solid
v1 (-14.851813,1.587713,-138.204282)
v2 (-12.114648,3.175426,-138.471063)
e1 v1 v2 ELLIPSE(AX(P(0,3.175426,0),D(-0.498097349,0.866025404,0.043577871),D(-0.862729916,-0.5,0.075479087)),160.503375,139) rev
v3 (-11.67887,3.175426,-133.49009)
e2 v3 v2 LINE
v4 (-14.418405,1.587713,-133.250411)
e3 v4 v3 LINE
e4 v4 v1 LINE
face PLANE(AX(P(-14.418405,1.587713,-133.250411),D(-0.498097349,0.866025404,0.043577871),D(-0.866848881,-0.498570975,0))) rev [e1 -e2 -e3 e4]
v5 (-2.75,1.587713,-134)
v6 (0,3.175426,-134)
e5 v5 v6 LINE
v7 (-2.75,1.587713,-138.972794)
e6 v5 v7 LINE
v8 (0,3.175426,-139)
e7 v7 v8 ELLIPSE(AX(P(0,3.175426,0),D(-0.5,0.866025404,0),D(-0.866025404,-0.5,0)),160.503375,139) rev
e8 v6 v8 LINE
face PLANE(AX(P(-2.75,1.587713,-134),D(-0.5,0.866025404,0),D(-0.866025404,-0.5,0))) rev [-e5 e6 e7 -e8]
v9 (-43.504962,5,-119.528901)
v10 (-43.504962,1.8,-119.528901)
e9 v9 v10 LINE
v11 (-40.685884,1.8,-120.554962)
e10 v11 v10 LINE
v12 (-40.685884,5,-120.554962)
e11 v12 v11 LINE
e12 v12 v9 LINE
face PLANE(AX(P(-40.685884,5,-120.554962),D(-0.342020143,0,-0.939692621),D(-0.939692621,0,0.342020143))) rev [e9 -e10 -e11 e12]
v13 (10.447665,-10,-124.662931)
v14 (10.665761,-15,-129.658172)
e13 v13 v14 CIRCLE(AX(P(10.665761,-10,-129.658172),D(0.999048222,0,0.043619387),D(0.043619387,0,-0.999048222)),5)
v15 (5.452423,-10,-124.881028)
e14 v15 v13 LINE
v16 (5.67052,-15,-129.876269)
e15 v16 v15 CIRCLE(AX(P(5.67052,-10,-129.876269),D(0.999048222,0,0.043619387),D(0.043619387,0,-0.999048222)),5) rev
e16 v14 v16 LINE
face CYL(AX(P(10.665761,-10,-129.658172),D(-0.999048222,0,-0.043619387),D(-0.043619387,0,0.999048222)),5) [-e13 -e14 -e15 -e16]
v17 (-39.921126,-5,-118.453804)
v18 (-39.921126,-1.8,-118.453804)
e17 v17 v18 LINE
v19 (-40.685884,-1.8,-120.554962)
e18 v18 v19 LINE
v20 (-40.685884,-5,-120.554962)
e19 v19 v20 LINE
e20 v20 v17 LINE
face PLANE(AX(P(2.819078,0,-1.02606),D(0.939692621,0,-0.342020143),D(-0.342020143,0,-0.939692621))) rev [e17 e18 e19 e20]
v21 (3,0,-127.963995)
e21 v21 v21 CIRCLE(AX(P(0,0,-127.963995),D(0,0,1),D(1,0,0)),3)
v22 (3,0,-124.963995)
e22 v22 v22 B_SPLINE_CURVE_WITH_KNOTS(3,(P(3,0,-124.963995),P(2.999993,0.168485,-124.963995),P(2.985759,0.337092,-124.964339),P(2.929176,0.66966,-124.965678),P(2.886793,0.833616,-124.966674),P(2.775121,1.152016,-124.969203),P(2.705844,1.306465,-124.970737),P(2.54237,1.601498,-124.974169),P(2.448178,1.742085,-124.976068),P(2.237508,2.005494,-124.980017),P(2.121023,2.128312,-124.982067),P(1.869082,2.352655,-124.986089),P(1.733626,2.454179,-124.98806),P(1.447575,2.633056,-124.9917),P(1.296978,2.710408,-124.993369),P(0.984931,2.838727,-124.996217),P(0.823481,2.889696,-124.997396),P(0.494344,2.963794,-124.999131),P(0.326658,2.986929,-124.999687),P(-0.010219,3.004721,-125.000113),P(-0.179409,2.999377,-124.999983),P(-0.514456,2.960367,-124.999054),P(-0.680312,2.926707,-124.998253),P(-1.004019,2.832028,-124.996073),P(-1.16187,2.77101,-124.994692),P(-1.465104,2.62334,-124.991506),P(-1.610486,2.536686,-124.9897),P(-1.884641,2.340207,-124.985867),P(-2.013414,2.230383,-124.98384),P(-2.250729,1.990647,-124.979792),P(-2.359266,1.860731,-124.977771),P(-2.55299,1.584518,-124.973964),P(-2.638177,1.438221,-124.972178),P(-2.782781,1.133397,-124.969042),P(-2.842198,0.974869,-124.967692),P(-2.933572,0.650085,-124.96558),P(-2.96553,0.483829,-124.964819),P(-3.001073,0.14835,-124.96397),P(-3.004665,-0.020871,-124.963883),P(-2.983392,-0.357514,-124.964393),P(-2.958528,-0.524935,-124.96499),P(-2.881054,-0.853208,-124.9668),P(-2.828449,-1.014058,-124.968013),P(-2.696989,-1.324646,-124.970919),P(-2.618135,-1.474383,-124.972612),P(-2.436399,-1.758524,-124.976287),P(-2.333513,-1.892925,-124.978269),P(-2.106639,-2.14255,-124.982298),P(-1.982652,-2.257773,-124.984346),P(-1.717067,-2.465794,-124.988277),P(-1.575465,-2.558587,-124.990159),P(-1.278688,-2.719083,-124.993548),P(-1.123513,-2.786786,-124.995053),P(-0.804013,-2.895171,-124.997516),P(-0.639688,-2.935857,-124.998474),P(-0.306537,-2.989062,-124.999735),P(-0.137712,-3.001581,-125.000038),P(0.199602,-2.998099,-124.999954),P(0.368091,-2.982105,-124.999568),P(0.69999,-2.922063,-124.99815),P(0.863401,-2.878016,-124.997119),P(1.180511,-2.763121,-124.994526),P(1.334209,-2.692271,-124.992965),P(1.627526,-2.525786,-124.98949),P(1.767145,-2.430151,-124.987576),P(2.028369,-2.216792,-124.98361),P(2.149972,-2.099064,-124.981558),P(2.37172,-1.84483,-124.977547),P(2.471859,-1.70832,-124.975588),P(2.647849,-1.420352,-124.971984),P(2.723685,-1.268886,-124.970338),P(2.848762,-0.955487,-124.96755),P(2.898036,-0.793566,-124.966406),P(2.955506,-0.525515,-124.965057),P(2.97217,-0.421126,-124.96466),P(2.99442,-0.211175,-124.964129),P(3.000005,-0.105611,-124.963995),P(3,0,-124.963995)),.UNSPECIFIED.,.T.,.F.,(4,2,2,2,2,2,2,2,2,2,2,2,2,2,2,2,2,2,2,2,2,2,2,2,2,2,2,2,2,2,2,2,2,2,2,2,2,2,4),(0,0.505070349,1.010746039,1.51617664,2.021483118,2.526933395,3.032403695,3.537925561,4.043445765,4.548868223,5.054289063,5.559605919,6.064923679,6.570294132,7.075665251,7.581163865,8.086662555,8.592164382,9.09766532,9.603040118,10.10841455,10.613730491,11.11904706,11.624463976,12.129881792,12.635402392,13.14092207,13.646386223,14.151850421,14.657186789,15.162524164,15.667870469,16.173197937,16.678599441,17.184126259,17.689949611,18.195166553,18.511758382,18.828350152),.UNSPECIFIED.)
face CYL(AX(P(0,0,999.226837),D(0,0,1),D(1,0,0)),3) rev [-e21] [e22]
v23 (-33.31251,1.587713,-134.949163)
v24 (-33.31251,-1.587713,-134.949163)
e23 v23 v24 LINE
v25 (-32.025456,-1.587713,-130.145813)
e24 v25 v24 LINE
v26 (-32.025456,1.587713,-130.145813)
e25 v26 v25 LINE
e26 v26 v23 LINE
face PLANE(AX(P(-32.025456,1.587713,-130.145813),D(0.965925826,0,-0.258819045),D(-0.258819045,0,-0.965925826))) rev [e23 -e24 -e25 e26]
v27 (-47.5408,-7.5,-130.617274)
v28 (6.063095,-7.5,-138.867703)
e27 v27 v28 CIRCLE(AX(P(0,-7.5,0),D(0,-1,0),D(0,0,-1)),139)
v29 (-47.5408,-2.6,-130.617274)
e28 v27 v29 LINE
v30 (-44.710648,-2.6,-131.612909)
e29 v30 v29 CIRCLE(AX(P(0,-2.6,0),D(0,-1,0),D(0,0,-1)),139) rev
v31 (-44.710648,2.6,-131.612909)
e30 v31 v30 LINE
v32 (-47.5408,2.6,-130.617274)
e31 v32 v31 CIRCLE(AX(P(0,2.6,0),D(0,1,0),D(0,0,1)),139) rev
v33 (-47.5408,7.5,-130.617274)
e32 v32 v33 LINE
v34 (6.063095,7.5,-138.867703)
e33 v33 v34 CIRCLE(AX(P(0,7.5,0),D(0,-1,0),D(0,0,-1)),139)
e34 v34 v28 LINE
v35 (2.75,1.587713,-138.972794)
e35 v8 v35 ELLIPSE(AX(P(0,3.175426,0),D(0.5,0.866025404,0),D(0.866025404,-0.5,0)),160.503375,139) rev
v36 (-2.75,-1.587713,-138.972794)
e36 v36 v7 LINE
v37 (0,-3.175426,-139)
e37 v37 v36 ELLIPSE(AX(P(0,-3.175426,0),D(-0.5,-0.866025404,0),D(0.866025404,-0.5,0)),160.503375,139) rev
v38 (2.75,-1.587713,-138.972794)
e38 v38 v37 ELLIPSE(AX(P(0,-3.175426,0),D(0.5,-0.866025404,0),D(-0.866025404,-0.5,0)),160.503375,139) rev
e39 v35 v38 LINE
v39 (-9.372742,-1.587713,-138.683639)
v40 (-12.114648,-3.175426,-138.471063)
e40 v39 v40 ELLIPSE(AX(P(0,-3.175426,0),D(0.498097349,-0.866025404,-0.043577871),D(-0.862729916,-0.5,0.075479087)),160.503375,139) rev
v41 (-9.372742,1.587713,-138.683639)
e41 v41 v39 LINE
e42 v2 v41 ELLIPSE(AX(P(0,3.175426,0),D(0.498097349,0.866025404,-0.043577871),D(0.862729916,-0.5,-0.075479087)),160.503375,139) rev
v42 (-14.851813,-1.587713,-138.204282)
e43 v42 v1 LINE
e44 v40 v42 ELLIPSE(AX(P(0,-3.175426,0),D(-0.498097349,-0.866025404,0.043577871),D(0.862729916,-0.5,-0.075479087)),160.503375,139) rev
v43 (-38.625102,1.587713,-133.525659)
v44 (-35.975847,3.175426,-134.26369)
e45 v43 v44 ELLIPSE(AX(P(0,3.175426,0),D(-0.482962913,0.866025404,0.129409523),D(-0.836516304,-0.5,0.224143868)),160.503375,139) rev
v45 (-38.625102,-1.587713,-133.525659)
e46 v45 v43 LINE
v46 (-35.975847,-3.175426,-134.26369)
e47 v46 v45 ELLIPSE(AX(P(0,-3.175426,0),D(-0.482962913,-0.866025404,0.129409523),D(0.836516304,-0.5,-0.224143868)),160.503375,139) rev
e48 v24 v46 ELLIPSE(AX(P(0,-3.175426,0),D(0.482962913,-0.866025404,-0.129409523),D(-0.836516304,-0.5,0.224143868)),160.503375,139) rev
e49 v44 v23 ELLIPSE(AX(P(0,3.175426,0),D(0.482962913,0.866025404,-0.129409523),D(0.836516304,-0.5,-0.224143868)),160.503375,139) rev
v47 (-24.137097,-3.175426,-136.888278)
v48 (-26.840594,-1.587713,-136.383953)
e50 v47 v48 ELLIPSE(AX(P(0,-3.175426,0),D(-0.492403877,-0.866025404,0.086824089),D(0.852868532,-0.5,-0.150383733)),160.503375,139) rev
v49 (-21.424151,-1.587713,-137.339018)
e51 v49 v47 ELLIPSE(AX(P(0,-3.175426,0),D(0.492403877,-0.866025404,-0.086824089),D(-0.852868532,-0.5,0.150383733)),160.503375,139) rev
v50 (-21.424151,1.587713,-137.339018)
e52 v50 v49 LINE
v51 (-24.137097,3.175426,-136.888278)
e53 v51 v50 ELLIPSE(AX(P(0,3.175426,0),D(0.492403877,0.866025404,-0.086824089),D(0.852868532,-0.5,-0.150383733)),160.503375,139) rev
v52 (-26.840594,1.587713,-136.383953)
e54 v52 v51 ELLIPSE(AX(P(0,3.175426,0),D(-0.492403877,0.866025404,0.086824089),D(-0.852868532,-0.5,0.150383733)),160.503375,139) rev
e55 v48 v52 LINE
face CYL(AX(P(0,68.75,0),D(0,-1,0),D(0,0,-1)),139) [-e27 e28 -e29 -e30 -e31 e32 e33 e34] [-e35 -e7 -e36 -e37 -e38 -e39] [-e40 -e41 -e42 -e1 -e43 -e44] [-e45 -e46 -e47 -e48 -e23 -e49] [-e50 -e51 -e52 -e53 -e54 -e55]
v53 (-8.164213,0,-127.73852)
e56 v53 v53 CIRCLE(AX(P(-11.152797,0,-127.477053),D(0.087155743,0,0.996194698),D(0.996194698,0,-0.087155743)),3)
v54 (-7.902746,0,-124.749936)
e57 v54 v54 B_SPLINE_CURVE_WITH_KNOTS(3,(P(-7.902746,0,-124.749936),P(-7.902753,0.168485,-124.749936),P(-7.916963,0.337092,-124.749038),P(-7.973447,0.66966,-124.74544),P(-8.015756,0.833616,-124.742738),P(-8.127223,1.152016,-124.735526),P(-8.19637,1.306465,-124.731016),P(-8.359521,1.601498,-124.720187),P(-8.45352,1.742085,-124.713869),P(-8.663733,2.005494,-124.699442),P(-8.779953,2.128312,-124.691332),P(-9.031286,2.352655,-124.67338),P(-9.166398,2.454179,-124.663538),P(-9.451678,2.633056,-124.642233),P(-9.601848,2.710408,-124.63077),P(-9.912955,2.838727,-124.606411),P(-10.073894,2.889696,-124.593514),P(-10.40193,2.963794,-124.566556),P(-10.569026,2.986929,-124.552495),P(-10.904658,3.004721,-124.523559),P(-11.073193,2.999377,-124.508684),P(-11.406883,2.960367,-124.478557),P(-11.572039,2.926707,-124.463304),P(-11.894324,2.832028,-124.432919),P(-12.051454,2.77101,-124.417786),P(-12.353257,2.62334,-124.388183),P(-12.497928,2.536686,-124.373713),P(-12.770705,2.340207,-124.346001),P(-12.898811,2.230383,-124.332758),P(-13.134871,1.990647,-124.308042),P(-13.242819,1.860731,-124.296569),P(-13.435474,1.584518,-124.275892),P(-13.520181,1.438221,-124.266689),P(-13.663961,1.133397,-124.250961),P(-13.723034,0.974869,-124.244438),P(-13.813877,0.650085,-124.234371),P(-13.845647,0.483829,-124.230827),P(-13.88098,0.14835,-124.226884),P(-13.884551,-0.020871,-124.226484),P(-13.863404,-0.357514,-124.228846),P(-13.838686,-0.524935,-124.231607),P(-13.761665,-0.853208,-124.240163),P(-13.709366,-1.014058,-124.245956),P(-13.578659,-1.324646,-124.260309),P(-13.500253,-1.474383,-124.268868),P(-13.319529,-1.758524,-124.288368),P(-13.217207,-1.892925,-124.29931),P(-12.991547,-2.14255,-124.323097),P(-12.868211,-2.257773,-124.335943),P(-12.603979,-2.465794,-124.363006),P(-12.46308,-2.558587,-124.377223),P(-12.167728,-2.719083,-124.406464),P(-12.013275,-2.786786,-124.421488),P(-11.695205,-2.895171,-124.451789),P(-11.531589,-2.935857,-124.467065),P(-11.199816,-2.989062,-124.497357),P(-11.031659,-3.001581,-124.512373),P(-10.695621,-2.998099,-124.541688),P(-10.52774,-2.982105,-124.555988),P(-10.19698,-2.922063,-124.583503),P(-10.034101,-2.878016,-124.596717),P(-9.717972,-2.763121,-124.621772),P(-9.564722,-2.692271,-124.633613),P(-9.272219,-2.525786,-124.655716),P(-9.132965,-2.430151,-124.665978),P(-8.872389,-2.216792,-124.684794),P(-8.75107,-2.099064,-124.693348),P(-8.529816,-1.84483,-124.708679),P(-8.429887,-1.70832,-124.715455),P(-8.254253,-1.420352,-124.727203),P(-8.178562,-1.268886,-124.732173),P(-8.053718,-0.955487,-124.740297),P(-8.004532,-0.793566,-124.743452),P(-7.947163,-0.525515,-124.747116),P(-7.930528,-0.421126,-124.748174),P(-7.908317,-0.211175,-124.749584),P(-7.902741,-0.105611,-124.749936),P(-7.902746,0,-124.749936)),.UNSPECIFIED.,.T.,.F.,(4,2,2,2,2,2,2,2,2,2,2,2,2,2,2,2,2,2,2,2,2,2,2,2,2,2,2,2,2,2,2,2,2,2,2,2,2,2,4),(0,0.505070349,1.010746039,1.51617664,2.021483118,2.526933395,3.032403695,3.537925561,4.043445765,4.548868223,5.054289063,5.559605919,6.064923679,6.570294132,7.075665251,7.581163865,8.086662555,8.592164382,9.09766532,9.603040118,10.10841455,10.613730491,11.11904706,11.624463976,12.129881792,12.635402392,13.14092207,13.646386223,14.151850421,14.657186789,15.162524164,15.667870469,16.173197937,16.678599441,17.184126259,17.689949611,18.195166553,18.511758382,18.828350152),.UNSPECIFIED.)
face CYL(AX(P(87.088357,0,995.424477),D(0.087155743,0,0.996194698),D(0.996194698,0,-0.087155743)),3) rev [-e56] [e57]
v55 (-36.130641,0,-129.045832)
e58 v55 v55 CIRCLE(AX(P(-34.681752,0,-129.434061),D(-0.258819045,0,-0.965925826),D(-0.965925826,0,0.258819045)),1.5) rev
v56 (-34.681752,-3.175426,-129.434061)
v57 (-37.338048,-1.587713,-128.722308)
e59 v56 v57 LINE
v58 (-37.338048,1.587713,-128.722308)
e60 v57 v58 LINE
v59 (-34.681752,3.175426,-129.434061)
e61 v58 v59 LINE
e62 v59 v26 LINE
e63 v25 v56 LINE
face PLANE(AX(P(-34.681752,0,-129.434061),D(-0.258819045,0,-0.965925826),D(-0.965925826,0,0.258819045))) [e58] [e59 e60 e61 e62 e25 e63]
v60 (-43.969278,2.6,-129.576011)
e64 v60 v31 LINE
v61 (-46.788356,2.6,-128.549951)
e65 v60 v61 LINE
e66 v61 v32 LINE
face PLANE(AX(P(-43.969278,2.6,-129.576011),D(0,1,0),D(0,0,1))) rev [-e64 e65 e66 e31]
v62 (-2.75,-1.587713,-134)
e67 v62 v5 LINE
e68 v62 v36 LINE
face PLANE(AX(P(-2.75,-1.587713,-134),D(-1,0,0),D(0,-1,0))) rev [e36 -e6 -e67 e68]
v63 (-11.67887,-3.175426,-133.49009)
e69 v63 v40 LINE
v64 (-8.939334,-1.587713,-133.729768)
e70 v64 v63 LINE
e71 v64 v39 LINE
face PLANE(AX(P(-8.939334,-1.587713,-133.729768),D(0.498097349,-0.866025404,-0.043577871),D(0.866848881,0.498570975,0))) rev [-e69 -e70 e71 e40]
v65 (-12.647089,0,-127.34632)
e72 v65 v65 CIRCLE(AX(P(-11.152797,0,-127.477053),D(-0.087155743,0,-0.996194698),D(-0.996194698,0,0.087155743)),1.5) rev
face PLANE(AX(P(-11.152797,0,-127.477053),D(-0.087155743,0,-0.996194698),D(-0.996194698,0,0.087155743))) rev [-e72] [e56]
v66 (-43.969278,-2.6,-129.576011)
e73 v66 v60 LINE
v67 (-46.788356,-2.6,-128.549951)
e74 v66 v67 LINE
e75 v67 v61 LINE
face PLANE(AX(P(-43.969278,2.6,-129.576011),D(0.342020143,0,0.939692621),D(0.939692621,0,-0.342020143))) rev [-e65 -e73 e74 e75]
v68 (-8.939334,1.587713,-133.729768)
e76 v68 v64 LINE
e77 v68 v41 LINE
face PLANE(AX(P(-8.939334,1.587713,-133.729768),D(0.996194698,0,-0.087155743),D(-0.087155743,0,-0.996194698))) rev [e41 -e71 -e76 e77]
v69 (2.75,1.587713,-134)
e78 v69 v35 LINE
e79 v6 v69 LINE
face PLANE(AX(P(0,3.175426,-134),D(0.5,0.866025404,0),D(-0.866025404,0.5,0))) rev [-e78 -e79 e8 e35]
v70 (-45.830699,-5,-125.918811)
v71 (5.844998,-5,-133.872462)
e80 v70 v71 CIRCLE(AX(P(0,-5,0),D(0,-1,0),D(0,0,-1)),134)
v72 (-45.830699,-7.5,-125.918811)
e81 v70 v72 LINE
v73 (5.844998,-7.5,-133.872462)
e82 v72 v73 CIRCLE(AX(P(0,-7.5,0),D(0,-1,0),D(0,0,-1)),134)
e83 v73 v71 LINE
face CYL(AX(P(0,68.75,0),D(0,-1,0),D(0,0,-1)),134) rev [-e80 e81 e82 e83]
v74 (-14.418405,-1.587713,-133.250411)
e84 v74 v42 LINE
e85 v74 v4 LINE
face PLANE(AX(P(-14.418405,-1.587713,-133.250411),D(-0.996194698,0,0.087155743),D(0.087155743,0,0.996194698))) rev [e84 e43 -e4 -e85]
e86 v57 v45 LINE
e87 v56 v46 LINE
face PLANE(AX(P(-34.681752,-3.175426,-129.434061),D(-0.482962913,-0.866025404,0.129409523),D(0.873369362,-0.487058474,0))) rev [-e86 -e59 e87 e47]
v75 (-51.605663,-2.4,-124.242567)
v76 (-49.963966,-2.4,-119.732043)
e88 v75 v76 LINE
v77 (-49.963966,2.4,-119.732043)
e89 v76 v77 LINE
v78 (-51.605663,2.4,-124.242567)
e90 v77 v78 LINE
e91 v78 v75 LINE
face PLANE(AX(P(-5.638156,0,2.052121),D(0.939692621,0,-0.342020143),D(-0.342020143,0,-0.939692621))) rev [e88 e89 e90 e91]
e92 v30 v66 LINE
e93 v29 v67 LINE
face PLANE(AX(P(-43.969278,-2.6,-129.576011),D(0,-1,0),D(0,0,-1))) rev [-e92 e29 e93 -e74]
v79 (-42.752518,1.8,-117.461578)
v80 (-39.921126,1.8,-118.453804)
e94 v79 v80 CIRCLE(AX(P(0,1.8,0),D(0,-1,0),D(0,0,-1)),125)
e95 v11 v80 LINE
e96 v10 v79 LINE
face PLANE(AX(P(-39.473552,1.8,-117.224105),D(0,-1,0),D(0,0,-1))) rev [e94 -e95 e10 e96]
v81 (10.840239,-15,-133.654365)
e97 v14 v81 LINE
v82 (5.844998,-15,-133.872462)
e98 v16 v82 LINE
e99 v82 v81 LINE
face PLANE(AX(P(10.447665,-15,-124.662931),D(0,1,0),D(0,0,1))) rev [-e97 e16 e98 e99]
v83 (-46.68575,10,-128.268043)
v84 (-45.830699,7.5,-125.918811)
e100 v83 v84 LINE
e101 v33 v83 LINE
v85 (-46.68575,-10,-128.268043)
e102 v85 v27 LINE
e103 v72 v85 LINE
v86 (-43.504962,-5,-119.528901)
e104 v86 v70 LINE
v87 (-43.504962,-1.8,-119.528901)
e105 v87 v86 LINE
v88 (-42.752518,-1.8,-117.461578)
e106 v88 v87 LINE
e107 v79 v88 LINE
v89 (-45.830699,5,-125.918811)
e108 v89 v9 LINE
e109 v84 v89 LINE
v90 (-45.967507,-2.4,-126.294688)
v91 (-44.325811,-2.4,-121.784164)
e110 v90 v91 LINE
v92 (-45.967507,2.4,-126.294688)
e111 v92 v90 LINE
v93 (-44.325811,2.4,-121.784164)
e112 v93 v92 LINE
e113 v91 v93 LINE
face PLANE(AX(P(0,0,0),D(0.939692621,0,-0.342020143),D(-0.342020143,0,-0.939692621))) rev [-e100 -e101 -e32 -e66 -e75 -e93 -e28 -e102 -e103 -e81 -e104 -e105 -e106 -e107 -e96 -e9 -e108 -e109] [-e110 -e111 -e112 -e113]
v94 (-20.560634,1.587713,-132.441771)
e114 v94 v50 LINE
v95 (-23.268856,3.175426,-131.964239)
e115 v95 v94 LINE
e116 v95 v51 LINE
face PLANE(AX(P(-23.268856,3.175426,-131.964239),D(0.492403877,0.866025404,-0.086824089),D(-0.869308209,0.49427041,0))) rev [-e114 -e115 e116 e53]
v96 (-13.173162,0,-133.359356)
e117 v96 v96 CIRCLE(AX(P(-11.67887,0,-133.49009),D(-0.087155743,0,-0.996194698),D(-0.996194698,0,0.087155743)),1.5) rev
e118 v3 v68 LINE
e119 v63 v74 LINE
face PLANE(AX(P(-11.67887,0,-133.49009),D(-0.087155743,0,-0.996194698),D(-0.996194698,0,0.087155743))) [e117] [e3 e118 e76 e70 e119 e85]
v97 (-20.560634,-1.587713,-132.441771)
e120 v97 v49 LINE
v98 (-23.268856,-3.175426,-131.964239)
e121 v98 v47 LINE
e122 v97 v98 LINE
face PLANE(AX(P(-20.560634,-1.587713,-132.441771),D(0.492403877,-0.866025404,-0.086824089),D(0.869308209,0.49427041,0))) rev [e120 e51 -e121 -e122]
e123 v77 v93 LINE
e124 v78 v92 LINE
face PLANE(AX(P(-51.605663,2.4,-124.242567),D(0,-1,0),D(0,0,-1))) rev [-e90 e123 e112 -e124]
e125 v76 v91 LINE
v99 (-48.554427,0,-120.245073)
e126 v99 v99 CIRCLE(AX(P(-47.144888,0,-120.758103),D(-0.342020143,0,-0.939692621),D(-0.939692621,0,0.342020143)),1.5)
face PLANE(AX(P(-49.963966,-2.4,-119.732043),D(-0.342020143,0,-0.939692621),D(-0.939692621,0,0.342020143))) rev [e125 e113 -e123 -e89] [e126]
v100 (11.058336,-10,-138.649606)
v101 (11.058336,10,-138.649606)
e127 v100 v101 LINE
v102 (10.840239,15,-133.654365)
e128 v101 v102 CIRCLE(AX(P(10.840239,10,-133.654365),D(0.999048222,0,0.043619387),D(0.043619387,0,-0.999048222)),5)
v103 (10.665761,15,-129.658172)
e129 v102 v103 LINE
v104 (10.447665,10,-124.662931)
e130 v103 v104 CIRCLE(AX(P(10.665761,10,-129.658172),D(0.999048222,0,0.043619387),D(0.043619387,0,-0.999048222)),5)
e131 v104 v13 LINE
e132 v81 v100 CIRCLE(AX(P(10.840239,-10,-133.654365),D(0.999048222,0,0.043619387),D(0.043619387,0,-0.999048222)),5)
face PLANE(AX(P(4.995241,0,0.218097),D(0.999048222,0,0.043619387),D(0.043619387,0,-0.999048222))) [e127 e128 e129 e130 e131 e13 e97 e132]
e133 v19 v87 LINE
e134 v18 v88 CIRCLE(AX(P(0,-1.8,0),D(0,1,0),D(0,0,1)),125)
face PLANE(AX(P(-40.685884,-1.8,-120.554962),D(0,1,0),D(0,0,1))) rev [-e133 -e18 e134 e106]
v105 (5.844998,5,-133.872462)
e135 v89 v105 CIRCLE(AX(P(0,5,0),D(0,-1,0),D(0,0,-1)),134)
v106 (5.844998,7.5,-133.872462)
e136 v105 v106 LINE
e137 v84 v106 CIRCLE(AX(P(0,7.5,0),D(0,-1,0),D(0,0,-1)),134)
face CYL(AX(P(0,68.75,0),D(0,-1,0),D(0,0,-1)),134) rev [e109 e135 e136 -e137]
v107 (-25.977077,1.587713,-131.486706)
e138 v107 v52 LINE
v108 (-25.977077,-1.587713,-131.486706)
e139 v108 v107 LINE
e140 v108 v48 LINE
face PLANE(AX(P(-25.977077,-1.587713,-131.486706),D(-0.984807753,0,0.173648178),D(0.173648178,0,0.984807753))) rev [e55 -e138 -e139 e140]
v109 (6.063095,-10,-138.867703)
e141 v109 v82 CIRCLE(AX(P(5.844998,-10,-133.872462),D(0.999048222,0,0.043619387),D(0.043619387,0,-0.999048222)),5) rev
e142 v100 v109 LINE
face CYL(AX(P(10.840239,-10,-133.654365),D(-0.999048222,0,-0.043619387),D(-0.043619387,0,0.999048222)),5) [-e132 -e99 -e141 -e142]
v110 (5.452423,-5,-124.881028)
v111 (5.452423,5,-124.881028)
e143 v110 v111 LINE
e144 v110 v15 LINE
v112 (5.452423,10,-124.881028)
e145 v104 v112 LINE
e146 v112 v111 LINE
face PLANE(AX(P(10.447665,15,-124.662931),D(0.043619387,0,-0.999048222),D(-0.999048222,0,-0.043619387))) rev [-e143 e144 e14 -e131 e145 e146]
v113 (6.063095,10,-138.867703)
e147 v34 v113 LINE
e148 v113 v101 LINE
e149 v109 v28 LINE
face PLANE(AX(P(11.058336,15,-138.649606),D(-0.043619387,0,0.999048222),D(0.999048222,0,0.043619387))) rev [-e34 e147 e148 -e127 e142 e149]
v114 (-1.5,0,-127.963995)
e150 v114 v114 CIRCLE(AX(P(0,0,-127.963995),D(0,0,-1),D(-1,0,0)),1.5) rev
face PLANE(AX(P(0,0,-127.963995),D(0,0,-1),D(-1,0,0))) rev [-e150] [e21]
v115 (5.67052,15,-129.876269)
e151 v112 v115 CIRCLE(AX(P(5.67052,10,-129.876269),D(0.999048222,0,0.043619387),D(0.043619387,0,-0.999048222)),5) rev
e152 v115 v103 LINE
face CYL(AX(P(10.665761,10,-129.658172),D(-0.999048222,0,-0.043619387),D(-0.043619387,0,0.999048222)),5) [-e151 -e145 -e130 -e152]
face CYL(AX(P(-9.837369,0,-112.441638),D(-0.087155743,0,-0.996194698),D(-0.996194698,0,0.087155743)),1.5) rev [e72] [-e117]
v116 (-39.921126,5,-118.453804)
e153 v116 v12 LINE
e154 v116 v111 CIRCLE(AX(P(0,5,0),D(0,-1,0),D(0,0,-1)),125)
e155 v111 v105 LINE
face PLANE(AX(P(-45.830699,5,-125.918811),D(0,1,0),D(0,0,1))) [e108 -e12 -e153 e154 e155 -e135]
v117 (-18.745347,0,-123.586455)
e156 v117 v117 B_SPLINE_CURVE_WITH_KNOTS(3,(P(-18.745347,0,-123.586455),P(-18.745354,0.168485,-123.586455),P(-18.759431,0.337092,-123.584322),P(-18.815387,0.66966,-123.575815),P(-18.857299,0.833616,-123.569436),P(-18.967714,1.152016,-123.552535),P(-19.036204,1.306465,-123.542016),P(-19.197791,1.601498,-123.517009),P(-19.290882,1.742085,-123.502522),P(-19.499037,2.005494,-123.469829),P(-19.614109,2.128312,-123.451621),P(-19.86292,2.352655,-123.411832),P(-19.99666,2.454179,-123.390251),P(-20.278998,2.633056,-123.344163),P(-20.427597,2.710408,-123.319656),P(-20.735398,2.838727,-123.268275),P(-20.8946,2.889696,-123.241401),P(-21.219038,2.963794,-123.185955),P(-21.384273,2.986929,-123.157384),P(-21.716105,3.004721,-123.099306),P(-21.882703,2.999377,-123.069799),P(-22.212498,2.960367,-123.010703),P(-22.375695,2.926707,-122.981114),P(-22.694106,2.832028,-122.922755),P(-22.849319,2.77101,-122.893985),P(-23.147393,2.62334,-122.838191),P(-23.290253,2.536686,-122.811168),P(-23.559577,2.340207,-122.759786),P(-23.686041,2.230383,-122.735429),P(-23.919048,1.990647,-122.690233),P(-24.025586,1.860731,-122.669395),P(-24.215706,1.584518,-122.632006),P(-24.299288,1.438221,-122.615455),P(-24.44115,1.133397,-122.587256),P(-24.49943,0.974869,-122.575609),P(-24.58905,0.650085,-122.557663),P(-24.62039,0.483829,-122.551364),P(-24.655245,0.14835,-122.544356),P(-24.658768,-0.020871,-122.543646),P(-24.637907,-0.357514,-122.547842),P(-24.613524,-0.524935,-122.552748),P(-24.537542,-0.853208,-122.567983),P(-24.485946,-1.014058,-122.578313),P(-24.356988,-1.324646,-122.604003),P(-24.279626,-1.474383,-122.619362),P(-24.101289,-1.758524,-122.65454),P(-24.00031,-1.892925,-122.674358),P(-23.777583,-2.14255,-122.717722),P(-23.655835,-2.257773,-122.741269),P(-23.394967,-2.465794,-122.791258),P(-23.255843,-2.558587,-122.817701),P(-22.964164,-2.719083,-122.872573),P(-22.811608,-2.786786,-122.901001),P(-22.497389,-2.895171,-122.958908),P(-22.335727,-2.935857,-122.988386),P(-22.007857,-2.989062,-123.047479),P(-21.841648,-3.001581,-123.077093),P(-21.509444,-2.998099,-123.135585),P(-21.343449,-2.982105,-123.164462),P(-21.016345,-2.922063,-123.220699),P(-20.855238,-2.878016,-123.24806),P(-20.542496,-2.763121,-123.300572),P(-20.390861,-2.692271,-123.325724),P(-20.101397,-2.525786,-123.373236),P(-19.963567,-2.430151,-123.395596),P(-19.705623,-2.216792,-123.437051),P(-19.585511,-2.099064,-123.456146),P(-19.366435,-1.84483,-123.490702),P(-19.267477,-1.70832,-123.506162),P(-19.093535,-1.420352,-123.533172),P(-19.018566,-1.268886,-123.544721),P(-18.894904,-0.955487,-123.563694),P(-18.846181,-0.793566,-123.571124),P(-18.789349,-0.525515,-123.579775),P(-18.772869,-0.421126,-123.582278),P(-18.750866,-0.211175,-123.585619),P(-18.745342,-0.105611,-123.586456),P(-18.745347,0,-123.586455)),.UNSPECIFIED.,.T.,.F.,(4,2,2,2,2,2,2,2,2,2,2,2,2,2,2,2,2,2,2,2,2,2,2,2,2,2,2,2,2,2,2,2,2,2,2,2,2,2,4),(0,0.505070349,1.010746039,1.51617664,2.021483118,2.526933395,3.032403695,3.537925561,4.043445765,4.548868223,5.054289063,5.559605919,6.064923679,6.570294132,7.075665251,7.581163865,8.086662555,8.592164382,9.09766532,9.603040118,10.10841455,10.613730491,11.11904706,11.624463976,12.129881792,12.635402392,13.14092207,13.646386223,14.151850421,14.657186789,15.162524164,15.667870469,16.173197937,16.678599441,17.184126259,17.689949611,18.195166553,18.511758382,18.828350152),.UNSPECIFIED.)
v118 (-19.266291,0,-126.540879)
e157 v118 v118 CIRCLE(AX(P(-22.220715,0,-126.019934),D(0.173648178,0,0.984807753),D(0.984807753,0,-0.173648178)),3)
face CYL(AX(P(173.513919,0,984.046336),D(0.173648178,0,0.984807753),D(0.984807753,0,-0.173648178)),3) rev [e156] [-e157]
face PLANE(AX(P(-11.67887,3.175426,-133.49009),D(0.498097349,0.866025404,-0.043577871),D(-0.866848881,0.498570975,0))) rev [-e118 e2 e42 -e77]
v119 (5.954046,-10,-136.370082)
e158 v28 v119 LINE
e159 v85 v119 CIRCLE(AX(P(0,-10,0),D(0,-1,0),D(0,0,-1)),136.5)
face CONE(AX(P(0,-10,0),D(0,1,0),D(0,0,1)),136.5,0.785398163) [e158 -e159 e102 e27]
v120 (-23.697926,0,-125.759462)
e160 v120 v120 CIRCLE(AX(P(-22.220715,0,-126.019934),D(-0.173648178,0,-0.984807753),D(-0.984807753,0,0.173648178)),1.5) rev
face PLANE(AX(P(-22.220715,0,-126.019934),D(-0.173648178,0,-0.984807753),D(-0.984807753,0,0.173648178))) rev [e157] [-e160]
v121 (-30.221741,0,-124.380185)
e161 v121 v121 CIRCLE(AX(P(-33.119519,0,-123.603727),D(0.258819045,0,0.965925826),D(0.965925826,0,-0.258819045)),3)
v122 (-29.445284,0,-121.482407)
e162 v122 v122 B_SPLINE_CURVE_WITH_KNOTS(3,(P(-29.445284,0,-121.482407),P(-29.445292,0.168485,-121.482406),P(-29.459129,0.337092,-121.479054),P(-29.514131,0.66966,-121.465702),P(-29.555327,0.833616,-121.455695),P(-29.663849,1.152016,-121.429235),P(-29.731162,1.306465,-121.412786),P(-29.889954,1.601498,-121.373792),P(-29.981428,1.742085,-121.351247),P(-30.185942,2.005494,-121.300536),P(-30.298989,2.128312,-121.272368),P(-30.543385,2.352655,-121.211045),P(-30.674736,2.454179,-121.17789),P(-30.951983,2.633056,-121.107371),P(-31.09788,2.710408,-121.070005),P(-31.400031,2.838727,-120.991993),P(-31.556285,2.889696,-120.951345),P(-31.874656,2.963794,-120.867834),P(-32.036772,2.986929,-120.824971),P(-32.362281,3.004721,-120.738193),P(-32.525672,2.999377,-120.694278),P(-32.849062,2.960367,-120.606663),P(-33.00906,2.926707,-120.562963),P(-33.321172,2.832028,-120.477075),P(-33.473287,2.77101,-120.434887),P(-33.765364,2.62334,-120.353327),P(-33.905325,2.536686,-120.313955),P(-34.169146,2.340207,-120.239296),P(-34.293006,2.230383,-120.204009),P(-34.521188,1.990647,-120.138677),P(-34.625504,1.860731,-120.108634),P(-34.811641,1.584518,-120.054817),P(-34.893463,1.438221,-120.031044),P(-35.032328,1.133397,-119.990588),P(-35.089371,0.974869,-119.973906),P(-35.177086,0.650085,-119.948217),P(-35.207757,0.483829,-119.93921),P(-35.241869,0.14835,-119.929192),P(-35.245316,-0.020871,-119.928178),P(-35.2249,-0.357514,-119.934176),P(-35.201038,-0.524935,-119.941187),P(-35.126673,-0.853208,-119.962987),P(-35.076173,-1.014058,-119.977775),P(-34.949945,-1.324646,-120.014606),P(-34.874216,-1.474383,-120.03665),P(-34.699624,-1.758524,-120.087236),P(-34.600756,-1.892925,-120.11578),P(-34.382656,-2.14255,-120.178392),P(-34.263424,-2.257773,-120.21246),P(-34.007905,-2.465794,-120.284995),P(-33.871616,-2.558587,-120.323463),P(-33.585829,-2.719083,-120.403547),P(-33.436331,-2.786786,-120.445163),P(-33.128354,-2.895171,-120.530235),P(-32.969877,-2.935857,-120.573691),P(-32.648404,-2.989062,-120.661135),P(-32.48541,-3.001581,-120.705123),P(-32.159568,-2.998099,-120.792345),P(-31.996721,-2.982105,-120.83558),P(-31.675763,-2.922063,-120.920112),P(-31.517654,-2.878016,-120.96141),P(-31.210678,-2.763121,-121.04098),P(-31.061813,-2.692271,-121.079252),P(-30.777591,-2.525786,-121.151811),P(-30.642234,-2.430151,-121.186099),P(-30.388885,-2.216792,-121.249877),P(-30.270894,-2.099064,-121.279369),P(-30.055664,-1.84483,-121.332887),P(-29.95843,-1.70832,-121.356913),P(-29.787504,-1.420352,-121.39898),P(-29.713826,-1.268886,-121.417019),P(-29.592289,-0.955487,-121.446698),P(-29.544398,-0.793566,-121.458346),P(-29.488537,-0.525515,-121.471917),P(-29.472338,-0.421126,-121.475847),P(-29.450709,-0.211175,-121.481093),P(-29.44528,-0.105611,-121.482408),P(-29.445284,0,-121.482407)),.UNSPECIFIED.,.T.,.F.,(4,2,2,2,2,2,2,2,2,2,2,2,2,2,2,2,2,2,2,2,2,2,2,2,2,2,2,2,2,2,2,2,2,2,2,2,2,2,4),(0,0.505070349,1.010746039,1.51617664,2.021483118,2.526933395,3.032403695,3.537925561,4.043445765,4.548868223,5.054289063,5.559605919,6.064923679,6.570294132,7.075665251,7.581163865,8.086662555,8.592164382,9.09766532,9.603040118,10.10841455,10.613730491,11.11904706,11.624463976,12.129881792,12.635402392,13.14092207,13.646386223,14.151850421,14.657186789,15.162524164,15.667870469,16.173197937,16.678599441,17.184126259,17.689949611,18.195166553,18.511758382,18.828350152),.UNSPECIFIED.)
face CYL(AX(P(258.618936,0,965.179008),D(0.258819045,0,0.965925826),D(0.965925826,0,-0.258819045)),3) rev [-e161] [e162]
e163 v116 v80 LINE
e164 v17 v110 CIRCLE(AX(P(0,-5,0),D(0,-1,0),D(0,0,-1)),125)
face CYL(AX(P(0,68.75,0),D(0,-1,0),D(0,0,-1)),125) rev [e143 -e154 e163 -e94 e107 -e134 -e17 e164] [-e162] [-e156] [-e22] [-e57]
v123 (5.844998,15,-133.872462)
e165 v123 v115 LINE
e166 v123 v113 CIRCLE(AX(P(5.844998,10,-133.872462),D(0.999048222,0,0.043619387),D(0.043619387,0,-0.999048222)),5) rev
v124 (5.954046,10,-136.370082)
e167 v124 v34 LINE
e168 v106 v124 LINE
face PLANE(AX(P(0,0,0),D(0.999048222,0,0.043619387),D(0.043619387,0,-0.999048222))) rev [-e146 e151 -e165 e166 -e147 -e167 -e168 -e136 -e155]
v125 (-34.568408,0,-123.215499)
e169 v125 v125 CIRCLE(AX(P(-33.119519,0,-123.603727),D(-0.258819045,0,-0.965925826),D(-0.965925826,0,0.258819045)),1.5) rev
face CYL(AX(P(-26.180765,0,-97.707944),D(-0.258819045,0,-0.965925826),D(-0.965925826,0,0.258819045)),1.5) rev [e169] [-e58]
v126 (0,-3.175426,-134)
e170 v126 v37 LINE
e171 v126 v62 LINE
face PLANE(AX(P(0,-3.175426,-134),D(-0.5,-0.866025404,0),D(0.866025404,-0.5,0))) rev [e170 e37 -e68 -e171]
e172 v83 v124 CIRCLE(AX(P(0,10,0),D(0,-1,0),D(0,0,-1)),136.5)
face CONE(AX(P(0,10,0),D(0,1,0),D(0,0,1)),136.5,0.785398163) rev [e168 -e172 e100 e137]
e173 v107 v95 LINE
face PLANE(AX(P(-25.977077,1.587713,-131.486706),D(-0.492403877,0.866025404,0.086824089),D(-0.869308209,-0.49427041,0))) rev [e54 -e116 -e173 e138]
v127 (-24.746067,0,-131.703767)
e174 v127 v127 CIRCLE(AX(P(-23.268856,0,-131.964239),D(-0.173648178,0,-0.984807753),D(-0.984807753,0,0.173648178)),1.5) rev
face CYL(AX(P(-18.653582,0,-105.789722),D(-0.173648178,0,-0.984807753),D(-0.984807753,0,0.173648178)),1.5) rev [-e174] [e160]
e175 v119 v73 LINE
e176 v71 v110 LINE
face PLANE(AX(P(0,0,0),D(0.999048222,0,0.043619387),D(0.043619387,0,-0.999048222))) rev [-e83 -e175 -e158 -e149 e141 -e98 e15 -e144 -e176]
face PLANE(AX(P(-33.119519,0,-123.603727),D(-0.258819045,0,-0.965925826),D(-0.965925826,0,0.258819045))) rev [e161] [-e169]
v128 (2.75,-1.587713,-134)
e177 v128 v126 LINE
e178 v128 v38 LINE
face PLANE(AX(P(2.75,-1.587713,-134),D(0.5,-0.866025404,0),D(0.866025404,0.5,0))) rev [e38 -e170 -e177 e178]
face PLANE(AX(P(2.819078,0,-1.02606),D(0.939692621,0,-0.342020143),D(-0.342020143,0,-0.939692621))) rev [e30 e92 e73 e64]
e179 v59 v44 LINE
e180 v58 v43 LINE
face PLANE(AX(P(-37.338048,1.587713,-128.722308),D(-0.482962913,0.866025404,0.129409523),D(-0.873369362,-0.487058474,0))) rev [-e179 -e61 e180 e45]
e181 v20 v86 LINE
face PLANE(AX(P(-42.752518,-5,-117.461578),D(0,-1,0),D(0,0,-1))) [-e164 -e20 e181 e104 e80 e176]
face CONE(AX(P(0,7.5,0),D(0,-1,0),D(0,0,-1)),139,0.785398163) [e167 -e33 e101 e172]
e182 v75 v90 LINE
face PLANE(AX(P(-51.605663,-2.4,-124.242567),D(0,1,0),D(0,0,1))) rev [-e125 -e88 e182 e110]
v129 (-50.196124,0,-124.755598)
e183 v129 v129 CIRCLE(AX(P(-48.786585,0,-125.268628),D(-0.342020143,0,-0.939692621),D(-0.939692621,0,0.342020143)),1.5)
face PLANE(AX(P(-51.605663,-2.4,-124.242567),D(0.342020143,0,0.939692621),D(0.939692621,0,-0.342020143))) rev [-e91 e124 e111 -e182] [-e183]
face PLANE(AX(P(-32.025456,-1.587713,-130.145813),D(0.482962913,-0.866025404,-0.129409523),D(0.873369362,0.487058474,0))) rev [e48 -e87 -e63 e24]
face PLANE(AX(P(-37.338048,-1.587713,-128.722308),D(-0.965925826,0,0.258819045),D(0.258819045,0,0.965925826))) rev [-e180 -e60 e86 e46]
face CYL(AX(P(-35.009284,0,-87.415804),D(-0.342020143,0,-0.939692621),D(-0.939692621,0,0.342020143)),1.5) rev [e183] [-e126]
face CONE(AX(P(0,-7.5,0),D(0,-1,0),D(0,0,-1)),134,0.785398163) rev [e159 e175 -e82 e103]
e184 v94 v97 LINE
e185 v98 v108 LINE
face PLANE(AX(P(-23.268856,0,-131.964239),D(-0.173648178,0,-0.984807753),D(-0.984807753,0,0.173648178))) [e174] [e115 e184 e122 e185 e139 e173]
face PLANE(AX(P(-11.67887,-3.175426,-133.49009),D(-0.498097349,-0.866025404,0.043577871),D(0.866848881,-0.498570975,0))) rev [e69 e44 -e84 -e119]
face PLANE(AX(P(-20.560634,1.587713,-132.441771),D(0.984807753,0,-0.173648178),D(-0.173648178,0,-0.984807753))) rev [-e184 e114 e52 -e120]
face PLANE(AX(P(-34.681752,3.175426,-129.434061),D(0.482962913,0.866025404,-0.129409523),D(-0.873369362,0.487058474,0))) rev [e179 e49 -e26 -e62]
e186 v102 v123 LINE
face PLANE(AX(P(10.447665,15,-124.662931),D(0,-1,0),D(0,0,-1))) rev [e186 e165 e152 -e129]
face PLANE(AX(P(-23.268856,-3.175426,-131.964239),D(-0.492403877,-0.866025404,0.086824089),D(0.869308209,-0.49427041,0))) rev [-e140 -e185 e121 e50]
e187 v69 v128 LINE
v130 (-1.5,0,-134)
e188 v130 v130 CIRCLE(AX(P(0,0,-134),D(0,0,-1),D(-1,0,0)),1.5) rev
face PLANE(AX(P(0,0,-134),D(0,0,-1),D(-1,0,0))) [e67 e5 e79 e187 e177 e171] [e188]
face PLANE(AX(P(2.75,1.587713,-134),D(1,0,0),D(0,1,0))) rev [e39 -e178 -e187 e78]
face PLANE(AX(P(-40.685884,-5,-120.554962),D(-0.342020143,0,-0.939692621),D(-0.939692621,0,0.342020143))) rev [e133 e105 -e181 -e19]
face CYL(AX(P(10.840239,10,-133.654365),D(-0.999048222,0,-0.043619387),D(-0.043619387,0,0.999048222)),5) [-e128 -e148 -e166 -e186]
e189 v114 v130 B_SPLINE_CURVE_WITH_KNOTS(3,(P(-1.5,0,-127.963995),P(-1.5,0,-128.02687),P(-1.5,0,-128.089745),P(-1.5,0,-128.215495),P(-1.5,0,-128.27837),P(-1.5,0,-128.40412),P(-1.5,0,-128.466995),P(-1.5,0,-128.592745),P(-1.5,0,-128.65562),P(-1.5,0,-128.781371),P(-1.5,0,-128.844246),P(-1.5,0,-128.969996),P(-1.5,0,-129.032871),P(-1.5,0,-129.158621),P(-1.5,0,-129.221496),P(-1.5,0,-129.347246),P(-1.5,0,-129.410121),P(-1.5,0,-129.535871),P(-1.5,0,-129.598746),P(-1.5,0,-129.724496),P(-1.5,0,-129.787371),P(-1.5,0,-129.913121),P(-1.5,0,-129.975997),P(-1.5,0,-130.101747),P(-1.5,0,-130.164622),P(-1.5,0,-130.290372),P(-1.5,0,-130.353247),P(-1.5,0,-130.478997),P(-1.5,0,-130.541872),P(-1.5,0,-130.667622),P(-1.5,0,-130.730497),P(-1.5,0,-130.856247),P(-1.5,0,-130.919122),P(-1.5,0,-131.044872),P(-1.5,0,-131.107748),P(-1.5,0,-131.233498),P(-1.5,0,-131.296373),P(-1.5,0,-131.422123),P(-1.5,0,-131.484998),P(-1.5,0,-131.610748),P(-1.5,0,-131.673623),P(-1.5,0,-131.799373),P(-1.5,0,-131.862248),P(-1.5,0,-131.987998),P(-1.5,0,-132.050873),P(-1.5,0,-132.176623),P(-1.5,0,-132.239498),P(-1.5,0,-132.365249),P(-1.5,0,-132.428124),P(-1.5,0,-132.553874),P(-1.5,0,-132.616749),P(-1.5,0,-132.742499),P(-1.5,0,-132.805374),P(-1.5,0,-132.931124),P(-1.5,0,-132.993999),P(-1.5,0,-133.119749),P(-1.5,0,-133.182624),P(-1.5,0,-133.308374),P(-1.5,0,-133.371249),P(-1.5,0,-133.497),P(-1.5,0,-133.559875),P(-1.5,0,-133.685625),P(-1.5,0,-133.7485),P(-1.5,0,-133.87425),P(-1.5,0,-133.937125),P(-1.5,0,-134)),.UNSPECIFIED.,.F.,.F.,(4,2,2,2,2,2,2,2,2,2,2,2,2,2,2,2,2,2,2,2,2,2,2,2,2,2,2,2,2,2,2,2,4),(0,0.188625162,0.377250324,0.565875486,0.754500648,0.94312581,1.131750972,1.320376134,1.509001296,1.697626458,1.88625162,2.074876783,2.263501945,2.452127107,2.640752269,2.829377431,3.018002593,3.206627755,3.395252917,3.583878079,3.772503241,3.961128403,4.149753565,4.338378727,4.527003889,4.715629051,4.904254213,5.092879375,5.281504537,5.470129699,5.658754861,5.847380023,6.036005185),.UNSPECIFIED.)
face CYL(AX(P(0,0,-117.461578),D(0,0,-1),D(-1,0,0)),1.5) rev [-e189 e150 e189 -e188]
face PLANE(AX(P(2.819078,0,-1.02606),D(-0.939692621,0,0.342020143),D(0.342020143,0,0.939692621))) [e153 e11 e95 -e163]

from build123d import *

# Parameters (mm, degrees)
REVOLVE_1_ANGLE          = 40
SKETCH_4_W               = 4.8
SKETCH_4_H               = 4.8
EXTRUDE_1_DEPTH          = 6
SKETCH_7_R               = 1.5
CUT_EXTRUDE_4_DEPTH      = 95.895882206
SKETCH_13_R              = 1.5
CUT_EXTRUDE_7_DEPTH      = 57.80711304
CUT_EXTRUDE_8_DEPTH      = 5
SKETCH_16_W              = 3
SKETCH_16_H              = 3
PATTERN_CIRCULAR_1_COUNT = 4
PATTERN_CIRCULAR_1_ANGLE = 15
SKETCH_10_W              = 2.2
SKETCH_10_H              = 5.2
CUT_EXTRUDE_5_DEPTH      = 3
SKETCH_11_W              = 47.375376564
SKETCH_11_H              = 32.407082742
CUT_EXTRUDE_6_DEPTH      = 149.607349927
SKETCH_12_W              = 14
SKETCH_12_H              = 30
EXTRUDE_2_DEPTH          = 5
FILLET_1_R               = 5


# Read off the part's stored shape, not the designer's step: 旋转1
with BuildPart() as part:
    # 旋转1 outline → 旋转1 (revolve)
    with BuildSketch(Plane(origin=(0, 0, 0), x_dir=(0.3420201433256701, 0, -0.9396926207859079), z_dir=(0.9396926207859079, 0, 0.3420201433256701))):
        Polygon((134, 5), (125, 5), (125, -5), (134, -5), (134, -7.5), (136.5, -10), (139, -7.5), (139, 7.5), (136.5, 10), (134, 7.5), align=None)
    revolve(axis=Axis((0, 0, 0), (0, 1, 0)), revolution_arc=REVOLVE_1_ANGLE)

    # 草图4 → 凸台-拉伸1 (add)
    with BuildSketch(Plane(origin=(0, 0, 0), x_dir=(0.3420201433256631, 0, 0.9396926207859104), z_dir=(-0.9396926207859104, 0, 0.3420201433256631))):
        with Locations((-132, 0)):
            Rectangle(SKETCH_4_W, SKETCH_4_H)
    extrude(amount=EXTRUDE_1_DEPTH)

    # 草图7 → 切除-拉伸4 (cut, through all)
    with BuildSketch(Plane(origin=(-45.967507263, 0, -126.294688234), x_dir=(-0.9396926207859105, 0, 0.3420201433256632), z_dir=(-0.3420201433256632, 0, -0.9396926207859105))):
        with Locations((3, 0)):
            Circle(SKETCH_7_R)
    extrude(amount=-CUT_EXTRUDE_4_DEPTH, mode=Mode.SUBTRACT)

    # 草图13 → 切除-拉伸7 (cut, through all)
    with BuildSketch(Plane(origin=(0, 0, -139), x_dir=(-1, 0, 0), z_dir=(0, 0, -1))):
        Circle(SKETCH_13_R)
    cut_extrude_7 = extrude(amount=-CUT_EXTRUDE_7_DEPTH, mode=Mode.SUBTRACT)

    # 草图14 → 切除-拉伸8 (cut)
    with BuildSketch(Plane(origin=(0, 0, -139), x_dir=(-1, 0, 0), z_dir=(0, 0, -1))):
        Polygon((0, -3.175426481), (2.75, -1.58771324), (2.75, 1.58771324), (0, 3.175426481), (-2.75, 1.58771324), (-2.75, -1.58771324), align=None)
    cut_extrude_8 = extrude(amount=-CUT_EXTRUDE_8_DEPTH, mode=Mode.SUBTRACT)

    # 草图16 → 切除-旋转1 (revolve, cut)
    with BuildSketch(Plane(origin=(0, 0, 0), x_dir=(1, 0, 0), z_dir=(0, 1, 0)), mode=Mode.PRIVATE) as cut_revolve_1_sk:
        with Locations((1.5, 126.463994814)):
            Rectangle(SKETCH_16_W, SKETCH_16_H)
    cut_revolve_1 = revolve(cut_revolve_1_sk.sketch.rotate(Axis((0, 0, 999.226836895), (0, 0, -1)), 180), axis=Axis((0, 0, 999.226836895), (0, 0, -1)), mode=Mode.SUBTRACT)

    # 阵列(圆周)1: 切除-拉伸7, 切除-拉伸8, 切除-旋转1 ×4 about axis
    pattern_circular_1_axis = Axis((0, 0, 0), (0, 1, 0))
    add([cut_extrude_7.rotate(pattern_circular_1_axis, i * PATTERN_CIRCULAR_1_ANGLE / (PATTERN_CIRCULAR_1_COUNT - 1)) for i in range(1, PATTERN_CIRCULAR_1_COUNT)], mode=Mode.SUBTRACT)
    add([cut_extrude_8.rotate(pattern_circular_1_axis, i * PATTERN_CIRCULAR_1_ANGLE / (PATTERN_CIRCULAR_1_COUNT - 1)) for i in range(1, PATTERN_CIRCULAR_1_COUNT)], mode=Mode.SUBTRACT)
    add([cut_revolve_1.rotate(pattern_circular_1_axis, i * PATTERN_CIRCULAR_1_ANGLE / (PATTERN_CIRCULAR_1_COUNT - 1)) for i in range(1, PATTERN_CIRCULAR_1_COUNT)], mode=Mode.SUBTRACT)

    # 草图10 → 切除-拉伸5 (cut)
    with BuildSketch(Plane(origin=(0, 0, 0), x_dir=(0.3420201433256631, 0, 0.9396926207859104), z_dir=(-0.9396926207859104, 0, 0.3420201433256631))):
        with Locations((-137.9, 0)):
            Rectangle(SKETCH_10_W, SKETCH_10_H)
        Polygon((-127.2, 5), (-125, 5), (-123.655375964, 5), (-123.655375964, 1.8), (-125, 1.8), (-127.2, 1.8), align=None)
        Polygon((-127.2, -1.8), (-125, -1.8), (-123.655375964, -1.8), (-123.655375964, -5), (-125, -5), (-127.2, -5), align=None)
    extrude(amount=-CUT_EXTRUDE_5_DEPTH, mode=Mode.SUBTRACT)

    # 草图11 → 切除-拉伸6 (cut, through all)
    with BuildSketch(Plane(origin=(0, 0, 0), x_dir=(0, -1, 0), z_dir=(0.9990482215818578, 0, 0.0436193873653361))):
        with Locations((-1.017262687, 125.577370773)):
            Rectangle(SKETCH_11_W, SKETCH_11_H)
    extrude(amount=CUT_EXTRUDE_6_DEPTH, mode=Mode.SUBTRACT)

    # 草图12 → 凸台-拉伸2 (add)
    with BuildSketch(Plane(origin=(0, 0, 0), x_dir=(0.043619387365336125, 0, -0.9990482215818578), z_dir=(0.9990482215818577, 0, 0.04361938736533612))):
        with Locations((132, 0)):
            Rectangle(SKETCH_12_W, SKETCH_12_H)
    extrude(amount=EXTRUDE_2_DEPTH)

    # 圆角1
    fillet_1_edges = [part.edges().sort_by_distance(p)[0] for p in [
        (7.950043975, 15, -124.771979229),
        (7.950043975, -15, -124.771979229),
        (8.560715398, -15, -138.758654331),
        (8.560715398, 15, -138.758654331),
    ]]
    fillet(fillet_1_edges, radius=FILLET_1_R)


solid = part.part
